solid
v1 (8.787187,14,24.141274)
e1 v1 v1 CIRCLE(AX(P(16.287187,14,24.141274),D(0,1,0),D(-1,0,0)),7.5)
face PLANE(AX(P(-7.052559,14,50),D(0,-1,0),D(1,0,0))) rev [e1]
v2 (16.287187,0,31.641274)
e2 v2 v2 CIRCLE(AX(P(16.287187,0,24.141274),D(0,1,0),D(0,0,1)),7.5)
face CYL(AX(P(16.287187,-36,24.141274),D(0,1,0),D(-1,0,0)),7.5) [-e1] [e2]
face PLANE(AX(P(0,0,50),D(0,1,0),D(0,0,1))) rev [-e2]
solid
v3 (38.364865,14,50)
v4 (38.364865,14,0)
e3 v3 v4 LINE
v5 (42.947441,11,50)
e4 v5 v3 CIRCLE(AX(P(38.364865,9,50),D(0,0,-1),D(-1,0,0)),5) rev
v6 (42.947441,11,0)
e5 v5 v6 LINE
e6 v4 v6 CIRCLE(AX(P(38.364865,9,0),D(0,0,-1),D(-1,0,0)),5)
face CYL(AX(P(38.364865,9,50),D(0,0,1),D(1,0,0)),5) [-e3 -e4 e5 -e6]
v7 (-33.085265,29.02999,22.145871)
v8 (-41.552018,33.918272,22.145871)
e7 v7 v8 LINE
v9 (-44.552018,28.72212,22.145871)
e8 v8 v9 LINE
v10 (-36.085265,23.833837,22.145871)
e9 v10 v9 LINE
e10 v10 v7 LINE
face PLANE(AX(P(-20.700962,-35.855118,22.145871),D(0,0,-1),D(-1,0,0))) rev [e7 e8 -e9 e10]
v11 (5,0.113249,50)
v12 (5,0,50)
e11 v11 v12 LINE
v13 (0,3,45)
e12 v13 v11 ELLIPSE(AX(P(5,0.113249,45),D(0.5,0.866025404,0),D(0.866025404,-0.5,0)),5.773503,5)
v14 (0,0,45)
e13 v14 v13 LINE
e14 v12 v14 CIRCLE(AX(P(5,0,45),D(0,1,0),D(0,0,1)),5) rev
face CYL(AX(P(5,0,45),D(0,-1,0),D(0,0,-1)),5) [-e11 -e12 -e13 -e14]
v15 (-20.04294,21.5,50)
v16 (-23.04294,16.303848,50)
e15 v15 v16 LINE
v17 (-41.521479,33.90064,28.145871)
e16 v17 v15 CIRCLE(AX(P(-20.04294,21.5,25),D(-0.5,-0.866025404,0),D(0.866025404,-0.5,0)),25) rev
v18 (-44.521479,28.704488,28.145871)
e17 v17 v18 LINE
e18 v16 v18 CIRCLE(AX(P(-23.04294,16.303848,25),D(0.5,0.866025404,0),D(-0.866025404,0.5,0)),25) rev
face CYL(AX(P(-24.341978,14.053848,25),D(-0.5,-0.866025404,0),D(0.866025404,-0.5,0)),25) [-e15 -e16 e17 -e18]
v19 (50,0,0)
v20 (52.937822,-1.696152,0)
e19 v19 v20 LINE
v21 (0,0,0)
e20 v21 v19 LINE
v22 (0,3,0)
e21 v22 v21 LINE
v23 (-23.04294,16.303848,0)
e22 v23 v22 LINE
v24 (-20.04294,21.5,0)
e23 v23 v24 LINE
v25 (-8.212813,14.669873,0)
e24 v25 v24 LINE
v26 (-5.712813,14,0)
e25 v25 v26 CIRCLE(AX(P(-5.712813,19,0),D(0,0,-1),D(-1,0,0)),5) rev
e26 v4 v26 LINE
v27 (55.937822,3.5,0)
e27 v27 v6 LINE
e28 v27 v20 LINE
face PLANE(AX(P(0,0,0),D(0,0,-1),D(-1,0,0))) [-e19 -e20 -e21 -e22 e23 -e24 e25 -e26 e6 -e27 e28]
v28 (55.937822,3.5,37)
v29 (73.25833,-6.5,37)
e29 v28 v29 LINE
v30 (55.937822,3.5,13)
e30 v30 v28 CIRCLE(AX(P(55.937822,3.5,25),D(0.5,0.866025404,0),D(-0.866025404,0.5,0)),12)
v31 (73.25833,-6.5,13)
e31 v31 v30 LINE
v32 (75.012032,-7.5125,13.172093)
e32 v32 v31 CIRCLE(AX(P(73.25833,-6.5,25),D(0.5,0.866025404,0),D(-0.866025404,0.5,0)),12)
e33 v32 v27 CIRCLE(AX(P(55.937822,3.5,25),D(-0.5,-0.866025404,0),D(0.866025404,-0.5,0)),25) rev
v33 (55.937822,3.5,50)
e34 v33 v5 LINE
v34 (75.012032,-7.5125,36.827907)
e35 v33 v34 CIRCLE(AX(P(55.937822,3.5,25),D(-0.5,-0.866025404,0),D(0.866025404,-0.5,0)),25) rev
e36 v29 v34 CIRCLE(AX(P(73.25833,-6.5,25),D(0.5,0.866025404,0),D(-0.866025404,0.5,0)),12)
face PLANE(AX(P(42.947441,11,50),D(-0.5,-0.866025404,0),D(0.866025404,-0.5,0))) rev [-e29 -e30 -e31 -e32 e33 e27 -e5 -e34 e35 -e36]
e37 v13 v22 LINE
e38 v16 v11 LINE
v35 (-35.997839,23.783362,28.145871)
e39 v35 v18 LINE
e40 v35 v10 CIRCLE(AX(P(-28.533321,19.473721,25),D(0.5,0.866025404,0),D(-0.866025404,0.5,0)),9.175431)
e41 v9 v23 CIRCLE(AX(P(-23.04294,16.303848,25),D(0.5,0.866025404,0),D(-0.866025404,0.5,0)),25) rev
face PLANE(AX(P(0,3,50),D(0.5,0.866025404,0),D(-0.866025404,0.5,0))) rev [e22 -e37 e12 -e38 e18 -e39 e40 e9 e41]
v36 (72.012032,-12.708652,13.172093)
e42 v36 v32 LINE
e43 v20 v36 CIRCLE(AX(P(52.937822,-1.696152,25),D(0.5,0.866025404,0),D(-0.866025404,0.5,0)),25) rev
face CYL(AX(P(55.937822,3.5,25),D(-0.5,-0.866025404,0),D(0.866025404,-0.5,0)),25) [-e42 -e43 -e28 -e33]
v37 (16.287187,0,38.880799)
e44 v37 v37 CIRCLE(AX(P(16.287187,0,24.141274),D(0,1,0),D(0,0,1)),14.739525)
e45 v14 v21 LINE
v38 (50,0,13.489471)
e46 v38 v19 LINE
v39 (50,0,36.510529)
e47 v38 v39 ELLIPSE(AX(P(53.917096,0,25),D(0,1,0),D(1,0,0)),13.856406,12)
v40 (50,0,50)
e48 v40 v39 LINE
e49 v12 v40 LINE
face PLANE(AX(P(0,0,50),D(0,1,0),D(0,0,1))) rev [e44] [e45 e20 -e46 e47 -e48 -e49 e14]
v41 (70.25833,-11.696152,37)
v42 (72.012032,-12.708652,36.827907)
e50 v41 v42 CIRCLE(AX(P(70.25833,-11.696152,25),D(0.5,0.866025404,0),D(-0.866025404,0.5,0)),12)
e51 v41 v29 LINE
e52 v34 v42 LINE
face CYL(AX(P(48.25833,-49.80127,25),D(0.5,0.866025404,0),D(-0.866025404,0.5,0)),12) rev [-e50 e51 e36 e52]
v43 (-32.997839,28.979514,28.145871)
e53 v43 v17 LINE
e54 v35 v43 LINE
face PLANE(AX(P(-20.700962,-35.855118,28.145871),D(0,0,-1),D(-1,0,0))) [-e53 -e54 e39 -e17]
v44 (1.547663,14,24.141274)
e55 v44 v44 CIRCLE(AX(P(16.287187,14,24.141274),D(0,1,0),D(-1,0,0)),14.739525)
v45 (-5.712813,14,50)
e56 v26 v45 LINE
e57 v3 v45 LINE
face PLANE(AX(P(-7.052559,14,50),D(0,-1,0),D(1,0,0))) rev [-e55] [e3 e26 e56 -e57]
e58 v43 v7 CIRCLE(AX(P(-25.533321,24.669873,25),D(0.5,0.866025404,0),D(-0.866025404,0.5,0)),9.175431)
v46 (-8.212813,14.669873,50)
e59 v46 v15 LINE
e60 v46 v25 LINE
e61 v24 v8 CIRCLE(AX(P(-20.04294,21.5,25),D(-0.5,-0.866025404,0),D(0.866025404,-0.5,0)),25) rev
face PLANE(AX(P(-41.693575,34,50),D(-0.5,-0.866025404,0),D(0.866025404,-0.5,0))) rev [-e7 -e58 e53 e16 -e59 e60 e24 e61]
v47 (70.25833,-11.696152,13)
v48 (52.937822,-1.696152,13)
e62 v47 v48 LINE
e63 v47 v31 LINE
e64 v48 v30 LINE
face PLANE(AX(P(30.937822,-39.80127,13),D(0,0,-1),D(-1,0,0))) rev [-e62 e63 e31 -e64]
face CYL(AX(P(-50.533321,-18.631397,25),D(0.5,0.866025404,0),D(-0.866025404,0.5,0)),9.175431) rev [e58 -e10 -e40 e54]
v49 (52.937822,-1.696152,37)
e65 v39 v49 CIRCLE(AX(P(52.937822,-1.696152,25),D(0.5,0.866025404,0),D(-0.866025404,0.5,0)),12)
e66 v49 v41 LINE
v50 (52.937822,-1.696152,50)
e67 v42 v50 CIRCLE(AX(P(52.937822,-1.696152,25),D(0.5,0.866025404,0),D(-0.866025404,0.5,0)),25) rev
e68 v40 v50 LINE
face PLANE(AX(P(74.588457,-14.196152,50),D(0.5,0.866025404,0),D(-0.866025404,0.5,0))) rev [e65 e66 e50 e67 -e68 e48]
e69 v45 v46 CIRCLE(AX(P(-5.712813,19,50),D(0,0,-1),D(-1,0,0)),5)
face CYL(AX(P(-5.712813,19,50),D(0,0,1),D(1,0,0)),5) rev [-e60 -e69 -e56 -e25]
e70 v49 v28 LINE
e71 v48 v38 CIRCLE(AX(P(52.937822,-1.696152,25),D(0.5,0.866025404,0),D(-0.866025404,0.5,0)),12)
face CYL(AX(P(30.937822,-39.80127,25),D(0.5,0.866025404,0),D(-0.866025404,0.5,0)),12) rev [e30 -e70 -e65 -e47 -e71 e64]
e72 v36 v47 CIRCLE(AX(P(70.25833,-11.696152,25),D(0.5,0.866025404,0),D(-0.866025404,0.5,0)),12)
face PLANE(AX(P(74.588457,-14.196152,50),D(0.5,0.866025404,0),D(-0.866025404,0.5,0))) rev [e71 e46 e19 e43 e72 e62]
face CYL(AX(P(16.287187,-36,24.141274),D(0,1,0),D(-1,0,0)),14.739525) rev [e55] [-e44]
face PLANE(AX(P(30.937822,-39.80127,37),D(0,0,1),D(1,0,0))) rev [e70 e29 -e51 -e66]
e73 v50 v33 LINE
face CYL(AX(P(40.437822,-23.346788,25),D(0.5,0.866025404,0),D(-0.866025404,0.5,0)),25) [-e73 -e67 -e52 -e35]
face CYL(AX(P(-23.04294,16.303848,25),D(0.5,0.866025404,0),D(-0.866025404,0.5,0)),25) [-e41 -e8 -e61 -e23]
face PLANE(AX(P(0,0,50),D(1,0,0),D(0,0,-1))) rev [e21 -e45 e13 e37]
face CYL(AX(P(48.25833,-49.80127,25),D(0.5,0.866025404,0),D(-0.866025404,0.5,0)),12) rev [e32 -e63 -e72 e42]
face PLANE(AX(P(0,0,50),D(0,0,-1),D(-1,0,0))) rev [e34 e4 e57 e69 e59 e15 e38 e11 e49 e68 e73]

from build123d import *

# Parameters (mm, degrees)
BOSS_EXTRUDE1_DEPTH = 50
FILLET1_R           = 25
FILLET2_R           = 5
FILLET3_R           = 5
CUT_EXTRUDE1_START  = -6
CUT_EXTRUDE1_DEPTH  = 6
SKETCH3_R           = 14.739524533
SKETCH3_R_2         = 7.5
CUT_EXTRUDE2_DEPTH  = 50
CUT_EXTRUDE3_DEPTH  = 50


# Read off the part's stored shape, not the designer's step: Cut-Extrude1
# Some blends are built 0.0001 mm under size
with BuildPart() as part:
    # Sketch1 → Boss-Extrude1 (new body)
    with BuildSketch(Plane.XY):
        Polygon((0, 0), (50, 0), (74.588457268, -14.196152423), (77.588457268, -9), (42.947441117, 11), (42.947441117, 14), (-7.052558883, 14), (-41.693575035, 34), (-44.693575035, 28.803847577), (0, 3), align=None)
    extrude(amount=BOSS_EXTRUDE1_DEPTH)

    # Fillet1
    fillet1_edges = [part.edges().sort_by_distance(p)[0] for p in [
        (76.088457268, -11.598076211, 0),
        (76.088457268, -11.598076211, 50),
        (-43.193575035, 31.401923789, 0),
        (-43.193575035, 31.401923789, 50),
    ]]
    fillet(fillet1_edges, radius=FILLET1_R - 0.0001)  # a hair under: the kernel refuses the full size

    # Fillet2
    # the kernel refuses this fillet: 5 mm, written as the material it takes off along each edge
    with BuildSketch(Plane(origin=(42.947441117, 14, -11.456439237), x_dir=(0, -1, 0), z_dir=(0, 0, 1))) as fillet2_piece_1:
        with BuildLine():
            CenterArc((5, -4.582575695), FILLET2_R, 113.578178478, 66.421821522)
            Line((0, -4.582575695), (-0.1, -4.582575695))
            Line((-0.1, -4.582575695), (-0.1, 0))
            Line((-0.1, 0), (0, 0.1))
            ThreePointArc((0, 0.1), (1.5, 0.1), (2.96, 0.091651514))
            Line((2.96, 0.091651514), (3, 0))
        make_face()
    extrude(amount=72.912878475, mode=Mode.SUBTRACT)

    # Fillet3
    fillet3_edges = [part.edges().sort_by_distance(p)[0] for p in [
        (-7.052558883, 14, 25),
        (0, 1.5, 50),
    ]]
    fillet(fillet3_edges, radius=FILLET3_R)

    # Cut-Extrude1 outline → Cut-Extrude1 (cut)
    with BuildSketch(Plane(origin=(4.299038106, 7.446152423, 0), x_dir=(0.8660254037844423, -0.4999999999999939, 0), z_dir=(0.4999999999999939, 0.8660254037844423, 0)).offset(CUT_EXTRUDE1_START)):
        with BuildLine():
            Line((-54, -28.145870627), (-43.066723537, -28.145870627))
            ThreePointArc((-43.066723537, -28.145870627), (-25.273308711, -24.845643163), (-43.167674884, -22.145870627))
            Line((-43.167674884, -22.145870627), (-54, -22.145870627))
            Line((-54, -22.145870627), (-54, -28.145870627))
        make_face()
    extrude(amount=CUT_EXTRUDE1_DEPTH, mode=Mode.SUBTRACT)

    # Sketch3 → Cut-Extrude2 (cut)
    with BuildSketch(Plane(origin=(0, 14, 0), x_dir=(1, 0, 0), z_dir=(0, 1, 0))):
        with Locations(Location((16.287187079, -24.141274019, 0), (0, 0, 180))):
            Circle(SKETCH3_R)
        with Locations(Location((16.287187079, -24.141274019, 0), (0, 0, 180))):
            Circle(SKETCH3_R_2, mode=Mode.SUBTRACT)
    extrude(amount=-CUT_EXTRUDE2_DEPTH, mode=Mode.SUBTRACT)


with BuildPart() as cut_extrude2_piece_1:
    # of the separate pieces the step leaves, piece 1, a body of its own (cut_extrude2_pieces)
    add(part.part.solids().sort_by_distance((-8.212812921, 14.669872981, 0))[0])

    # Sketch4 → Cut-Extrude3 (cut)
    with BuildSketch(Plane(origin=(15.5, 26.846787517, 0), x_dir=(0.8660254037844423, -0.49999999999999384, 0), z_dir=(0.49999999999999384, 0.8660254037844423, 0))):
        with BuildLine():
            Line((46.693575035, -13), (66.693575035, -13))
            ThreePointArc((66.693575035, -13), (78.693575035, -25), (66.693575035, -37))
            Line((66.693575035, -37), (46.693575035, -37))
            ThreePointArc((46.693575035, -37), (34.693575035, -25), (46.693575035, -13))
        make_face()
    extrude(amount=-CUT_EXTRUDE3_DEPTH, mode=Mode.SUBTRACT)


with BuildPart() as cut_extrude2_piece_2:
    # of the separate pieces the step leaves, piece 2, a body of its own (cut_extrude2_pieces)
    add(part.part.solids().sort_by_distance((8.787187079, 14, 24.141274019))[0])


solid = Compound([cut_extrude2_piece_1.part, cut_extrude2_piece_2.part])
